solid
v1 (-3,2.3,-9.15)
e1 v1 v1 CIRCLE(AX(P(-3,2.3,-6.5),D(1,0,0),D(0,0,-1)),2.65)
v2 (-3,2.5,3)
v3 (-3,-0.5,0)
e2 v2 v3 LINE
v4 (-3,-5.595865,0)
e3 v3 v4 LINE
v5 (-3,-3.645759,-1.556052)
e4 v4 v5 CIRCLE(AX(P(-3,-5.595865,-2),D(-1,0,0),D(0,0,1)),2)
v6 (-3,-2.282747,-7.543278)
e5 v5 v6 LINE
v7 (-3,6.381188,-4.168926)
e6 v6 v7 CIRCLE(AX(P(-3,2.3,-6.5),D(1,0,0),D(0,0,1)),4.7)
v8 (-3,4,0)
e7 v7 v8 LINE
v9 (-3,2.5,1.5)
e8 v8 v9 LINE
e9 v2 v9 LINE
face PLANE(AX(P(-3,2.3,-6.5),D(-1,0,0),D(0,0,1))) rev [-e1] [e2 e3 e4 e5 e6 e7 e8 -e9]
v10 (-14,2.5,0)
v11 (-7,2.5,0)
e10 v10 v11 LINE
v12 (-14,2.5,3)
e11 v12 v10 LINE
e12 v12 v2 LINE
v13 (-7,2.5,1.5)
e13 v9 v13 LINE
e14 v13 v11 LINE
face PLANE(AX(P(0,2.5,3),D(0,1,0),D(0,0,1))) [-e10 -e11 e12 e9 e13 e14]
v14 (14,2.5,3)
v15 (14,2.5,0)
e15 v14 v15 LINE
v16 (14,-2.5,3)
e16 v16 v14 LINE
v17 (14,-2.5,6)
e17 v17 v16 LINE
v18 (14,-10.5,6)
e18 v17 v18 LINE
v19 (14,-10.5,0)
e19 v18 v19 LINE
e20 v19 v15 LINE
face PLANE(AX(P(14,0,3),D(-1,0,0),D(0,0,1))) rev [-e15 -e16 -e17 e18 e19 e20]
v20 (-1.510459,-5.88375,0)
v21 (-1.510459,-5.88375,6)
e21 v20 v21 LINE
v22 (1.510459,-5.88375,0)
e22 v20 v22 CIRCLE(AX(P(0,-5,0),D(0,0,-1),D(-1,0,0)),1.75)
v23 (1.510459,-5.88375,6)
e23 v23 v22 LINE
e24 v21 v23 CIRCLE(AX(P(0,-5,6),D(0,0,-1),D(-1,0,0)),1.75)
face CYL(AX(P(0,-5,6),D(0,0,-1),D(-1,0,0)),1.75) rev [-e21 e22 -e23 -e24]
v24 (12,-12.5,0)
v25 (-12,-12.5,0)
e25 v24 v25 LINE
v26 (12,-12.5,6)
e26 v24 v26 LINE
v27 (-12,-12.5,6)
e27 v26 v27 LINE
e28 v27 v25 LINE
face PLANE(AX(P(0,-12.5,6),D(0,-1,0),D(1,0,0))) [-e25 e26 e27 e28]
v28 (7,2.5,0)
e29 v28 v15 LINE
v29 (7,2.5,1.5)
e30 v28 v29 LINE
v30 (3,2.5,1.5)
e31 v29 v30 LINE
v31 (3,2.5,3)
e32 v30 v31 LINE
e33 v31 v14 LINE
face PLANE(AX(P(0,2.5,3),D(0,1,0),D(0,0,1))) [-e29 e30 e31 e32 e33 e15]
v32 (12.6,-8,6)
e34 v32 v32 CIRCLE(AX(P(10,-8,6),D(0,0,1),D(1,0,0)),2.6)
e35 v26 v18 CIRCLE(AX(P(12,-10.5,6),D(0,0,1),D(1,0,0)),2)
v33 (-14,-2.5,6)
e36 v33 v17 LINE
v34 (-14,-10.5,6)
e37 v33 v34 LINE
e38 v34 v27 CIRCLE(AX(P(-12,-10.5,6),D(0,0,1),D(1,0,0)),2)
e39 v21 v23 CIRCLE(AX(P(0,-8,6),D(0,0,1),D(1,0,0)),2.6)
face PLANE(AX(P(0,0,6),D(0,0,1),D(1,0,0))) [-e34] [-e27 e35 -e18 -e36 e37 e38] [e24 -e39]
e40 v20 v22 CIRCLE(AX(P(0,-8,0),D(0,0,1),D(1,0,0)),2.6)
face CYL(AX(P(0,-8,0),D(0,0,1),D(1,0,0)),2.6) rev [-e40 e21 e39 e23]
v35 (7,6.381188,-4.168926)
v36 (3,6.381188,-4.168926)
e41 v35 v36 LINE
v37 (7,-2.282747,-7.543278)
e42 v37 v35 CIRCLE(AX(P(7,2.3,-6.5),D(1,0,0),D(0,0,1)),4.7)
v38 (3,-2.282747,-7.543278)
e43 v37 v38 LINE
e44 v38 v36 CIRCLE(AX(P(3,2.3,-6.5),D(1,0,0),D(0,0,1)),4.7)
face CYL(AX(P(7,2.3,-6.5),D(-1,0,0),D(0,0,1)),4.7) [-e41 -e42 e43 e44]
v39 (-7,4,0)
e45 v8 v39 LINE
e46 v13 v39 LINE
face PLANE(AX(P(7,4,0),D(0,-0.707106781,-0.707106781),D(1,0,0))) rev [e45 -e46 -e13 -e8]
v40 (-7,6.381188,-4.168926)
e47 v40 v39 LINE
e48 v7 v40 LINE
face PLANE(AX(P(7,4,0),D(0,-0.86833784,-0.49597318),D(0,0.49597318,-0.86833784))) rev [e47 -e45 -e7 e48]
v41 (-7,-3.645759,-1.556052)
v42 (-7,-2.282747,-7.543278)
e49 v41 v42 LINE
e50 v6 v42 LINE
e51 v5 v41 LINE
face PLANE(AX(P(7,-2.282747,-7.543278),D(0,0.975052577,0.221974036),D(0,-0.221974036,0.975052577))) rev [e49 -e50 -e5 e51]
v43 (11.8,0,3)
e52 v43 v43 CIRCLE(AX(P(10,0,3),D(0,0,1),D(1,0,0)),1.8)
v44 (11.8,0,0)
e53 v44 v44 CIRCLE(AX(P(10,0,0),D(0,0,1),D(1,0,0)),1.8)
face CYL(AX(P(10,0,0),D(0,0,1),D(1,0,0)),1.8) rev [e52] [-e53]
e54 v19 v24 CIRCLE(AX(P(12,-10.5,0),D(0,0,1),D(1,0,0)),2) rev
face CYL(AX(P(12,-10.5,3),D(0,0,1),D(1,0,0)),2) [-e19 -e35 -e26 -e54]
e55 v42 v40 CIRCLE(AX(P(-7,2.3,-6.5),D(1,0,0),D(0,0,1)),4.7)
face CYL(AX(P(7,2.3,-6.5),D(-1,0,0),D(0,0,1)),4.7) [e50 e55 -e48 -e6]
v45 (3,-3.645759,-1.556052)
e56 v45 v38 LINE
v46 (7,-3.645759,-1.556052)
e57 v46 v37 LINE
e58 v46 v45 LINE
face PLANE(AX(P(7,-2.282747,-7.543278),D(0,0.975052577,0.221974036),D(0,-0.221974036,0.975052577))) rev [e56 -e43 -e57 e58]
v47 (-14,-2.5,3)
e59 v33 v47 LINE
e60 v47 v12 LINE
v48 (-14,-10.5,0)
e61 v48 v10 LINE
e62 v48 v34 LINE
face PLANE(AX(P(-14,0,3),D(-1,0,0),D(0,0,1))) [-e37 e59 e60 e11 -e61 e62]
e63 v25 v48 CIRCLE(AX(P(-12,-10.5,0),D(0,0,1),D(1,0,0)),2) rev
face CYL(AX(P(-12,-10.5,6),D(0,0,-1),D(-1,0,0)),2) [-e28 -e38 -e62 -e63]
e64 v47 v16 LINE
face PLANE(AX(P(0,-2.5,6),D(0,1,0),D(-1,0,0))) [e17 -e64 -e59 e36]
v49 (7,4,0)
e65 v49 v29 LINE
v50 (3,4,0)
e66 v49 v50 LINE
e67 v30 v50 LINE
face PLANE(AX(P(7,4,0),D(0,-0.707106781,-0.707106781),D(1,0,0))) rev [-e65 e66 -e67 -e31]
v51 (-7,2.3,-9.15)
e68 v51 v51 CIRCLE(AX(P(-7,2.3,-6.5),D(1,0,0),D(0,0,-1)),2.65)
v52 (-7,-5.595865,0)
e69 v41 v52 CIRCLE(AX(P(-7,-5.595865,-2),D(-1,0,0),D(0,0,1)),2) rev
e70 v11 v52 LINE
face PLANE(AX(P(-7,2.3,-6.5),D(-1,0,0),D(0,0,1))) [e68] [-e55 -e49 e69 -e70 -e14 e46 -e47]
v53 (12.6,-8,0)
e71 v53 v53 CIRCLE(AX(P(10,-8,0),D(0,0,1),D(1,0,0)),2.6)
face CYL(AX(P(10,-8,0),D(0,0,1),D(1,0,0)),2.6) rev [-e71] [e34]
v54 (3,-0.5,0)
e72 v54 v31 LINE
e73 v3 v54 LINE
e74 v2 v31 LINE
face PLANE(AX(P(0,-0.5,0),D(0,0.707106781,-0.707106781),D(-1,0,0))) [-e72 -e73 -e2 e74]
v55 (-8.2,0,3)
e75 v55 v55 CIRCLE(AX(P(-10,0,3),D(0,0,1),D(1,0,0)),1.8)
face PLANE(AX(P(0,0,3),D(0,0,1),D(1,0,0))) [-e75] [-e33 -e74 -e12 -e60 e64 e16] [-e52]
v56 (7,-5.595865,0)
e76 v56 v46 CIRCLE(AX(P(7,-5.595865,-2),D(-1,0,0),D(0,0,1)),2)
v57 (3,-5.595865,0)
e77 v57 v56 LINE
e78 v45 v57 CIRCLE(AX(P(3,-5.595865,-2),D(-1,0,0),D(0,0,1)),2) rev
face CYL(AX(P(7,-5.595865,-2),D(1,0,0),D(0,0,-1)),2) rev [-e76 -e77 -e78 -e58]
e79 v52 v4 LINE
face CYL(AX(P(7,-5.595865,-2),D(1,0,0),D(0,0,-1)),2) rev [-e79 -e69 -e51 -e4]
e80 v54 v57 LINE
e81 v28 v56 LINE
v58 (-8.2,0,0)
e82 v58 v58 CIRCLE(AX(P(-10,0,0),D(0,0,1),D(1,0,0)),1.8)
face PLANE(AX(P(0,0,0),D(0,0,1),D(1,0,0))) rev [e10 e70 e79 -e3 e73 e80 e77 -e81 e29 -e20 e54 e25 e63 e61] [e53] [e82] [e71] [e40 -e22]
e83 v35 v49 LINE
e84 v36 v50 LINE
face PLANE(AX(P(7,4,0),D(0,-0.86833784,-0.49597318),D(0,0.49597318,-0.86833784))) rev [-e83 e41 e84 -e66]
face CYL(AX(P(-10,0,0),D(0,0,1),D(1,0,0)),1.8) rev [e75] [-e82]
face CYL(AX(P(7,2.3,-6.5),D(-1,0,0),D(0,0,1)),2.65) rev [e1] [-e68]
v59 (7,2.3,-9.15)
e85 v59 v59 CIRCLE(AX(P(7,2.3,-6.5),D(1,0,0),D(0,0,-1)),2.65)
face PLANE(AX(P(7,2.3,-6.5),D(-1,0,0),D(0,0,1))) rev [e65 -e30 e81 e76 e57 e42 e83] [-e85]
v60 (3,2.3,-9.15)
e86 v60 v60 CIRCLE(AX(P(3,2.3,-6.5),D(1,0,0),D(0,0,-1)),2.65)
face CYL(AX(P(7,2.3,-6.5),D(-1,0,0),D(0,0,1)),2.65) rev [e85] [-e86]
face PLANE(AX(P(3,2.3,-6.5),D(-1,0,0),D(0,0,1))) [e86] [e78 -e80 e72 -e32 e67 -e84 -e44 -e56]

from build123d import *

# Parameters (mm, degrees)
SKETCH1_W           = 28
SKETCH1_H           = 5
BOSS_EXTRUDE1_DEPTH = 3
SKETCH1_3_W         = 28
SKETCH1_3_H         = 10
BOSS_EXTRUDE2_DEPTH = 6
SKETCH2_R           = 1.8
CUT_EXTRUDE1_DEPTH  = 20.006577809
SKETCH3_R           = 2.6
CUT_EXTRUDE2_DEPTH  = 20.704060495
SKETCH4_R           = 1.75
CUT_EXTRUDE3_DEPTH  = 20.704060495
SKETCH5_R           = 2.65
BOSS_EXTRUDE3_DEPTH = 7
SKETCH5_3_R         = 2.65
CUT_EXTRUDE5_DEPTH  = 3
CHAMFER1_SIZE       = 3
CHAMFER2_SIZE       = 1.5
FILLET1_R           = 2


with BuildPart() as part:
    # Sketch1 → Boss-Extrude1 (new body)
    with BuildSketch(Plane.XY):
        Rectangle(SKETCH1_W, SKETCH1_H)
    extrude(amount=BOSS_EXTRUDE1_DEPTH)

    # Sketch1<3> → Boss-Extrude2 (add)
    with BuildSketch(Plane.XY):
        with Locations((0, -7.5)):
            Rectangle(SKETCH1_3_W, SKETCH1_3_H)
    extrude(amount=BOSS_EXTRUDE2_DEPTH)

    # Sketch2 → Cut-Extrude1 (cut, through all)
    with BuildSketch(Plane.XY.offset(3)):
        with Locations((10, 0)):
            Circle(SKETCH2_R)
        with Locations((-10, 0)):
            Circle(SKETCH2_R)
    extrude(amount=-CUT_EXTRUDE1_DEPTH, mode=Mode.SUBTRACT)

    # Sketch3 → Cut-Extrude2 (cut, through all)
    with BuildSketch(Plane.XY.offset(6)):
        with Locations((10, -8)):
            Circle(SKETCH3_R)
        with Locations((0, -8)):
            Circle(SKETCH3_R)
    extrude(amount=-CUT_EXTRUDE2_DEPTH, mode=Mode.SUBTRACT)

    # Sketch4 → Cut-Extrude3 (cut, through all)
    with BuildSketch(Plane(origin=(0, 0, 0), x_dir=(-1, 0, 0), z_dir=(0, 0, -1))):
        with Locations((0, -5)):
            Circle(SKETCH4_R)
    extrude(amount=-CUT_EXTRUDE3_DEPTH, mode=Mode.SUBTRACT)

    # Sketch5 → Boss-Extrude3 (add, symmetric)
    with BuildSketch(Plane(origin=(0, 0, 0), x_dir=(0, 0, -1), z_dir=(1, 0, 0))):
        with BuildLine():
            Line((0, 4), (0, -4))
            Line((0, -4), (7.543277969, -2.282747111))
            ThreePointArc((7.543277969, -2.282747111), (10.879560122, 4.005711915), (4.168926053, 6.381187848))
            Line((4.168926053, 6.381187848), (0, 4))
        make_face()
        with Locations((6.5, 2.3)):
            Circle(SKETCH5_R, mode=Mode.SUBTRACT)
    extrude(amount=BOSS_EXTRUDE3_DEPTH, both=True)

    # Sketch5<3> → Cut-Extrude5 (cut, symmetric)
    with BuildSketch(Plane(origin=(0, 0, 0), x_dir=(0, 0, -1), z_dir=(1, 0, 0))):
        with BuildLine():
            Line((0, 4), (0, -4))
            Line((0, -4), (7.543277969, -2.282747111))
            ThreePointArc((7.543277969, -2.282747111), (10.879560122, 4.005711915), (4.168926053, 6.381187848))
            Line((4.168926053, 6.381187848), (0, 4))
        make_face()
        with Locations((6.5, 2.3)):
            Circle(SKETCH5_3_R, mode=Mode.SUBTRACT)
    extrude(amount=CUT_EXTRUDE5_DEPTH, both=True, mode=Mode.SUBTRACT)

    # Chamfer1
    chamfer1_edges = [part.edges().sort_by_distance(p)[0] for p in [
        (0, 2.5, 0),
    ]]
    chamfer(chamfer1_edges, length=CHAMFER1_SIZE - 0.0001)  # a hair under: the kernel refuses the full size

    # Chamfer2
    chamfer2_edges = [part.edges().sort_by_distance(p)[0] for p in [
        (-5, 2.5, 0),
        (5, 2.5, 0),
    ]]
    chamfer(chamfer2_edges, length=CHAMFER2_SIZE - 0.0001)  # a hair under: the kernel refuses the full size

    # Fillet1
    fillet1_edges = [part.edges().sort_by_distance(p)[0] for p in [
        (-14, -12.5, 3),
        (14, -12.5, 3),
        (5, -4, 0),
        (-5, -4, 0),
    ]]
    fillet(fillet1_edges, radius=FILLET1_R)


solid = part.part
